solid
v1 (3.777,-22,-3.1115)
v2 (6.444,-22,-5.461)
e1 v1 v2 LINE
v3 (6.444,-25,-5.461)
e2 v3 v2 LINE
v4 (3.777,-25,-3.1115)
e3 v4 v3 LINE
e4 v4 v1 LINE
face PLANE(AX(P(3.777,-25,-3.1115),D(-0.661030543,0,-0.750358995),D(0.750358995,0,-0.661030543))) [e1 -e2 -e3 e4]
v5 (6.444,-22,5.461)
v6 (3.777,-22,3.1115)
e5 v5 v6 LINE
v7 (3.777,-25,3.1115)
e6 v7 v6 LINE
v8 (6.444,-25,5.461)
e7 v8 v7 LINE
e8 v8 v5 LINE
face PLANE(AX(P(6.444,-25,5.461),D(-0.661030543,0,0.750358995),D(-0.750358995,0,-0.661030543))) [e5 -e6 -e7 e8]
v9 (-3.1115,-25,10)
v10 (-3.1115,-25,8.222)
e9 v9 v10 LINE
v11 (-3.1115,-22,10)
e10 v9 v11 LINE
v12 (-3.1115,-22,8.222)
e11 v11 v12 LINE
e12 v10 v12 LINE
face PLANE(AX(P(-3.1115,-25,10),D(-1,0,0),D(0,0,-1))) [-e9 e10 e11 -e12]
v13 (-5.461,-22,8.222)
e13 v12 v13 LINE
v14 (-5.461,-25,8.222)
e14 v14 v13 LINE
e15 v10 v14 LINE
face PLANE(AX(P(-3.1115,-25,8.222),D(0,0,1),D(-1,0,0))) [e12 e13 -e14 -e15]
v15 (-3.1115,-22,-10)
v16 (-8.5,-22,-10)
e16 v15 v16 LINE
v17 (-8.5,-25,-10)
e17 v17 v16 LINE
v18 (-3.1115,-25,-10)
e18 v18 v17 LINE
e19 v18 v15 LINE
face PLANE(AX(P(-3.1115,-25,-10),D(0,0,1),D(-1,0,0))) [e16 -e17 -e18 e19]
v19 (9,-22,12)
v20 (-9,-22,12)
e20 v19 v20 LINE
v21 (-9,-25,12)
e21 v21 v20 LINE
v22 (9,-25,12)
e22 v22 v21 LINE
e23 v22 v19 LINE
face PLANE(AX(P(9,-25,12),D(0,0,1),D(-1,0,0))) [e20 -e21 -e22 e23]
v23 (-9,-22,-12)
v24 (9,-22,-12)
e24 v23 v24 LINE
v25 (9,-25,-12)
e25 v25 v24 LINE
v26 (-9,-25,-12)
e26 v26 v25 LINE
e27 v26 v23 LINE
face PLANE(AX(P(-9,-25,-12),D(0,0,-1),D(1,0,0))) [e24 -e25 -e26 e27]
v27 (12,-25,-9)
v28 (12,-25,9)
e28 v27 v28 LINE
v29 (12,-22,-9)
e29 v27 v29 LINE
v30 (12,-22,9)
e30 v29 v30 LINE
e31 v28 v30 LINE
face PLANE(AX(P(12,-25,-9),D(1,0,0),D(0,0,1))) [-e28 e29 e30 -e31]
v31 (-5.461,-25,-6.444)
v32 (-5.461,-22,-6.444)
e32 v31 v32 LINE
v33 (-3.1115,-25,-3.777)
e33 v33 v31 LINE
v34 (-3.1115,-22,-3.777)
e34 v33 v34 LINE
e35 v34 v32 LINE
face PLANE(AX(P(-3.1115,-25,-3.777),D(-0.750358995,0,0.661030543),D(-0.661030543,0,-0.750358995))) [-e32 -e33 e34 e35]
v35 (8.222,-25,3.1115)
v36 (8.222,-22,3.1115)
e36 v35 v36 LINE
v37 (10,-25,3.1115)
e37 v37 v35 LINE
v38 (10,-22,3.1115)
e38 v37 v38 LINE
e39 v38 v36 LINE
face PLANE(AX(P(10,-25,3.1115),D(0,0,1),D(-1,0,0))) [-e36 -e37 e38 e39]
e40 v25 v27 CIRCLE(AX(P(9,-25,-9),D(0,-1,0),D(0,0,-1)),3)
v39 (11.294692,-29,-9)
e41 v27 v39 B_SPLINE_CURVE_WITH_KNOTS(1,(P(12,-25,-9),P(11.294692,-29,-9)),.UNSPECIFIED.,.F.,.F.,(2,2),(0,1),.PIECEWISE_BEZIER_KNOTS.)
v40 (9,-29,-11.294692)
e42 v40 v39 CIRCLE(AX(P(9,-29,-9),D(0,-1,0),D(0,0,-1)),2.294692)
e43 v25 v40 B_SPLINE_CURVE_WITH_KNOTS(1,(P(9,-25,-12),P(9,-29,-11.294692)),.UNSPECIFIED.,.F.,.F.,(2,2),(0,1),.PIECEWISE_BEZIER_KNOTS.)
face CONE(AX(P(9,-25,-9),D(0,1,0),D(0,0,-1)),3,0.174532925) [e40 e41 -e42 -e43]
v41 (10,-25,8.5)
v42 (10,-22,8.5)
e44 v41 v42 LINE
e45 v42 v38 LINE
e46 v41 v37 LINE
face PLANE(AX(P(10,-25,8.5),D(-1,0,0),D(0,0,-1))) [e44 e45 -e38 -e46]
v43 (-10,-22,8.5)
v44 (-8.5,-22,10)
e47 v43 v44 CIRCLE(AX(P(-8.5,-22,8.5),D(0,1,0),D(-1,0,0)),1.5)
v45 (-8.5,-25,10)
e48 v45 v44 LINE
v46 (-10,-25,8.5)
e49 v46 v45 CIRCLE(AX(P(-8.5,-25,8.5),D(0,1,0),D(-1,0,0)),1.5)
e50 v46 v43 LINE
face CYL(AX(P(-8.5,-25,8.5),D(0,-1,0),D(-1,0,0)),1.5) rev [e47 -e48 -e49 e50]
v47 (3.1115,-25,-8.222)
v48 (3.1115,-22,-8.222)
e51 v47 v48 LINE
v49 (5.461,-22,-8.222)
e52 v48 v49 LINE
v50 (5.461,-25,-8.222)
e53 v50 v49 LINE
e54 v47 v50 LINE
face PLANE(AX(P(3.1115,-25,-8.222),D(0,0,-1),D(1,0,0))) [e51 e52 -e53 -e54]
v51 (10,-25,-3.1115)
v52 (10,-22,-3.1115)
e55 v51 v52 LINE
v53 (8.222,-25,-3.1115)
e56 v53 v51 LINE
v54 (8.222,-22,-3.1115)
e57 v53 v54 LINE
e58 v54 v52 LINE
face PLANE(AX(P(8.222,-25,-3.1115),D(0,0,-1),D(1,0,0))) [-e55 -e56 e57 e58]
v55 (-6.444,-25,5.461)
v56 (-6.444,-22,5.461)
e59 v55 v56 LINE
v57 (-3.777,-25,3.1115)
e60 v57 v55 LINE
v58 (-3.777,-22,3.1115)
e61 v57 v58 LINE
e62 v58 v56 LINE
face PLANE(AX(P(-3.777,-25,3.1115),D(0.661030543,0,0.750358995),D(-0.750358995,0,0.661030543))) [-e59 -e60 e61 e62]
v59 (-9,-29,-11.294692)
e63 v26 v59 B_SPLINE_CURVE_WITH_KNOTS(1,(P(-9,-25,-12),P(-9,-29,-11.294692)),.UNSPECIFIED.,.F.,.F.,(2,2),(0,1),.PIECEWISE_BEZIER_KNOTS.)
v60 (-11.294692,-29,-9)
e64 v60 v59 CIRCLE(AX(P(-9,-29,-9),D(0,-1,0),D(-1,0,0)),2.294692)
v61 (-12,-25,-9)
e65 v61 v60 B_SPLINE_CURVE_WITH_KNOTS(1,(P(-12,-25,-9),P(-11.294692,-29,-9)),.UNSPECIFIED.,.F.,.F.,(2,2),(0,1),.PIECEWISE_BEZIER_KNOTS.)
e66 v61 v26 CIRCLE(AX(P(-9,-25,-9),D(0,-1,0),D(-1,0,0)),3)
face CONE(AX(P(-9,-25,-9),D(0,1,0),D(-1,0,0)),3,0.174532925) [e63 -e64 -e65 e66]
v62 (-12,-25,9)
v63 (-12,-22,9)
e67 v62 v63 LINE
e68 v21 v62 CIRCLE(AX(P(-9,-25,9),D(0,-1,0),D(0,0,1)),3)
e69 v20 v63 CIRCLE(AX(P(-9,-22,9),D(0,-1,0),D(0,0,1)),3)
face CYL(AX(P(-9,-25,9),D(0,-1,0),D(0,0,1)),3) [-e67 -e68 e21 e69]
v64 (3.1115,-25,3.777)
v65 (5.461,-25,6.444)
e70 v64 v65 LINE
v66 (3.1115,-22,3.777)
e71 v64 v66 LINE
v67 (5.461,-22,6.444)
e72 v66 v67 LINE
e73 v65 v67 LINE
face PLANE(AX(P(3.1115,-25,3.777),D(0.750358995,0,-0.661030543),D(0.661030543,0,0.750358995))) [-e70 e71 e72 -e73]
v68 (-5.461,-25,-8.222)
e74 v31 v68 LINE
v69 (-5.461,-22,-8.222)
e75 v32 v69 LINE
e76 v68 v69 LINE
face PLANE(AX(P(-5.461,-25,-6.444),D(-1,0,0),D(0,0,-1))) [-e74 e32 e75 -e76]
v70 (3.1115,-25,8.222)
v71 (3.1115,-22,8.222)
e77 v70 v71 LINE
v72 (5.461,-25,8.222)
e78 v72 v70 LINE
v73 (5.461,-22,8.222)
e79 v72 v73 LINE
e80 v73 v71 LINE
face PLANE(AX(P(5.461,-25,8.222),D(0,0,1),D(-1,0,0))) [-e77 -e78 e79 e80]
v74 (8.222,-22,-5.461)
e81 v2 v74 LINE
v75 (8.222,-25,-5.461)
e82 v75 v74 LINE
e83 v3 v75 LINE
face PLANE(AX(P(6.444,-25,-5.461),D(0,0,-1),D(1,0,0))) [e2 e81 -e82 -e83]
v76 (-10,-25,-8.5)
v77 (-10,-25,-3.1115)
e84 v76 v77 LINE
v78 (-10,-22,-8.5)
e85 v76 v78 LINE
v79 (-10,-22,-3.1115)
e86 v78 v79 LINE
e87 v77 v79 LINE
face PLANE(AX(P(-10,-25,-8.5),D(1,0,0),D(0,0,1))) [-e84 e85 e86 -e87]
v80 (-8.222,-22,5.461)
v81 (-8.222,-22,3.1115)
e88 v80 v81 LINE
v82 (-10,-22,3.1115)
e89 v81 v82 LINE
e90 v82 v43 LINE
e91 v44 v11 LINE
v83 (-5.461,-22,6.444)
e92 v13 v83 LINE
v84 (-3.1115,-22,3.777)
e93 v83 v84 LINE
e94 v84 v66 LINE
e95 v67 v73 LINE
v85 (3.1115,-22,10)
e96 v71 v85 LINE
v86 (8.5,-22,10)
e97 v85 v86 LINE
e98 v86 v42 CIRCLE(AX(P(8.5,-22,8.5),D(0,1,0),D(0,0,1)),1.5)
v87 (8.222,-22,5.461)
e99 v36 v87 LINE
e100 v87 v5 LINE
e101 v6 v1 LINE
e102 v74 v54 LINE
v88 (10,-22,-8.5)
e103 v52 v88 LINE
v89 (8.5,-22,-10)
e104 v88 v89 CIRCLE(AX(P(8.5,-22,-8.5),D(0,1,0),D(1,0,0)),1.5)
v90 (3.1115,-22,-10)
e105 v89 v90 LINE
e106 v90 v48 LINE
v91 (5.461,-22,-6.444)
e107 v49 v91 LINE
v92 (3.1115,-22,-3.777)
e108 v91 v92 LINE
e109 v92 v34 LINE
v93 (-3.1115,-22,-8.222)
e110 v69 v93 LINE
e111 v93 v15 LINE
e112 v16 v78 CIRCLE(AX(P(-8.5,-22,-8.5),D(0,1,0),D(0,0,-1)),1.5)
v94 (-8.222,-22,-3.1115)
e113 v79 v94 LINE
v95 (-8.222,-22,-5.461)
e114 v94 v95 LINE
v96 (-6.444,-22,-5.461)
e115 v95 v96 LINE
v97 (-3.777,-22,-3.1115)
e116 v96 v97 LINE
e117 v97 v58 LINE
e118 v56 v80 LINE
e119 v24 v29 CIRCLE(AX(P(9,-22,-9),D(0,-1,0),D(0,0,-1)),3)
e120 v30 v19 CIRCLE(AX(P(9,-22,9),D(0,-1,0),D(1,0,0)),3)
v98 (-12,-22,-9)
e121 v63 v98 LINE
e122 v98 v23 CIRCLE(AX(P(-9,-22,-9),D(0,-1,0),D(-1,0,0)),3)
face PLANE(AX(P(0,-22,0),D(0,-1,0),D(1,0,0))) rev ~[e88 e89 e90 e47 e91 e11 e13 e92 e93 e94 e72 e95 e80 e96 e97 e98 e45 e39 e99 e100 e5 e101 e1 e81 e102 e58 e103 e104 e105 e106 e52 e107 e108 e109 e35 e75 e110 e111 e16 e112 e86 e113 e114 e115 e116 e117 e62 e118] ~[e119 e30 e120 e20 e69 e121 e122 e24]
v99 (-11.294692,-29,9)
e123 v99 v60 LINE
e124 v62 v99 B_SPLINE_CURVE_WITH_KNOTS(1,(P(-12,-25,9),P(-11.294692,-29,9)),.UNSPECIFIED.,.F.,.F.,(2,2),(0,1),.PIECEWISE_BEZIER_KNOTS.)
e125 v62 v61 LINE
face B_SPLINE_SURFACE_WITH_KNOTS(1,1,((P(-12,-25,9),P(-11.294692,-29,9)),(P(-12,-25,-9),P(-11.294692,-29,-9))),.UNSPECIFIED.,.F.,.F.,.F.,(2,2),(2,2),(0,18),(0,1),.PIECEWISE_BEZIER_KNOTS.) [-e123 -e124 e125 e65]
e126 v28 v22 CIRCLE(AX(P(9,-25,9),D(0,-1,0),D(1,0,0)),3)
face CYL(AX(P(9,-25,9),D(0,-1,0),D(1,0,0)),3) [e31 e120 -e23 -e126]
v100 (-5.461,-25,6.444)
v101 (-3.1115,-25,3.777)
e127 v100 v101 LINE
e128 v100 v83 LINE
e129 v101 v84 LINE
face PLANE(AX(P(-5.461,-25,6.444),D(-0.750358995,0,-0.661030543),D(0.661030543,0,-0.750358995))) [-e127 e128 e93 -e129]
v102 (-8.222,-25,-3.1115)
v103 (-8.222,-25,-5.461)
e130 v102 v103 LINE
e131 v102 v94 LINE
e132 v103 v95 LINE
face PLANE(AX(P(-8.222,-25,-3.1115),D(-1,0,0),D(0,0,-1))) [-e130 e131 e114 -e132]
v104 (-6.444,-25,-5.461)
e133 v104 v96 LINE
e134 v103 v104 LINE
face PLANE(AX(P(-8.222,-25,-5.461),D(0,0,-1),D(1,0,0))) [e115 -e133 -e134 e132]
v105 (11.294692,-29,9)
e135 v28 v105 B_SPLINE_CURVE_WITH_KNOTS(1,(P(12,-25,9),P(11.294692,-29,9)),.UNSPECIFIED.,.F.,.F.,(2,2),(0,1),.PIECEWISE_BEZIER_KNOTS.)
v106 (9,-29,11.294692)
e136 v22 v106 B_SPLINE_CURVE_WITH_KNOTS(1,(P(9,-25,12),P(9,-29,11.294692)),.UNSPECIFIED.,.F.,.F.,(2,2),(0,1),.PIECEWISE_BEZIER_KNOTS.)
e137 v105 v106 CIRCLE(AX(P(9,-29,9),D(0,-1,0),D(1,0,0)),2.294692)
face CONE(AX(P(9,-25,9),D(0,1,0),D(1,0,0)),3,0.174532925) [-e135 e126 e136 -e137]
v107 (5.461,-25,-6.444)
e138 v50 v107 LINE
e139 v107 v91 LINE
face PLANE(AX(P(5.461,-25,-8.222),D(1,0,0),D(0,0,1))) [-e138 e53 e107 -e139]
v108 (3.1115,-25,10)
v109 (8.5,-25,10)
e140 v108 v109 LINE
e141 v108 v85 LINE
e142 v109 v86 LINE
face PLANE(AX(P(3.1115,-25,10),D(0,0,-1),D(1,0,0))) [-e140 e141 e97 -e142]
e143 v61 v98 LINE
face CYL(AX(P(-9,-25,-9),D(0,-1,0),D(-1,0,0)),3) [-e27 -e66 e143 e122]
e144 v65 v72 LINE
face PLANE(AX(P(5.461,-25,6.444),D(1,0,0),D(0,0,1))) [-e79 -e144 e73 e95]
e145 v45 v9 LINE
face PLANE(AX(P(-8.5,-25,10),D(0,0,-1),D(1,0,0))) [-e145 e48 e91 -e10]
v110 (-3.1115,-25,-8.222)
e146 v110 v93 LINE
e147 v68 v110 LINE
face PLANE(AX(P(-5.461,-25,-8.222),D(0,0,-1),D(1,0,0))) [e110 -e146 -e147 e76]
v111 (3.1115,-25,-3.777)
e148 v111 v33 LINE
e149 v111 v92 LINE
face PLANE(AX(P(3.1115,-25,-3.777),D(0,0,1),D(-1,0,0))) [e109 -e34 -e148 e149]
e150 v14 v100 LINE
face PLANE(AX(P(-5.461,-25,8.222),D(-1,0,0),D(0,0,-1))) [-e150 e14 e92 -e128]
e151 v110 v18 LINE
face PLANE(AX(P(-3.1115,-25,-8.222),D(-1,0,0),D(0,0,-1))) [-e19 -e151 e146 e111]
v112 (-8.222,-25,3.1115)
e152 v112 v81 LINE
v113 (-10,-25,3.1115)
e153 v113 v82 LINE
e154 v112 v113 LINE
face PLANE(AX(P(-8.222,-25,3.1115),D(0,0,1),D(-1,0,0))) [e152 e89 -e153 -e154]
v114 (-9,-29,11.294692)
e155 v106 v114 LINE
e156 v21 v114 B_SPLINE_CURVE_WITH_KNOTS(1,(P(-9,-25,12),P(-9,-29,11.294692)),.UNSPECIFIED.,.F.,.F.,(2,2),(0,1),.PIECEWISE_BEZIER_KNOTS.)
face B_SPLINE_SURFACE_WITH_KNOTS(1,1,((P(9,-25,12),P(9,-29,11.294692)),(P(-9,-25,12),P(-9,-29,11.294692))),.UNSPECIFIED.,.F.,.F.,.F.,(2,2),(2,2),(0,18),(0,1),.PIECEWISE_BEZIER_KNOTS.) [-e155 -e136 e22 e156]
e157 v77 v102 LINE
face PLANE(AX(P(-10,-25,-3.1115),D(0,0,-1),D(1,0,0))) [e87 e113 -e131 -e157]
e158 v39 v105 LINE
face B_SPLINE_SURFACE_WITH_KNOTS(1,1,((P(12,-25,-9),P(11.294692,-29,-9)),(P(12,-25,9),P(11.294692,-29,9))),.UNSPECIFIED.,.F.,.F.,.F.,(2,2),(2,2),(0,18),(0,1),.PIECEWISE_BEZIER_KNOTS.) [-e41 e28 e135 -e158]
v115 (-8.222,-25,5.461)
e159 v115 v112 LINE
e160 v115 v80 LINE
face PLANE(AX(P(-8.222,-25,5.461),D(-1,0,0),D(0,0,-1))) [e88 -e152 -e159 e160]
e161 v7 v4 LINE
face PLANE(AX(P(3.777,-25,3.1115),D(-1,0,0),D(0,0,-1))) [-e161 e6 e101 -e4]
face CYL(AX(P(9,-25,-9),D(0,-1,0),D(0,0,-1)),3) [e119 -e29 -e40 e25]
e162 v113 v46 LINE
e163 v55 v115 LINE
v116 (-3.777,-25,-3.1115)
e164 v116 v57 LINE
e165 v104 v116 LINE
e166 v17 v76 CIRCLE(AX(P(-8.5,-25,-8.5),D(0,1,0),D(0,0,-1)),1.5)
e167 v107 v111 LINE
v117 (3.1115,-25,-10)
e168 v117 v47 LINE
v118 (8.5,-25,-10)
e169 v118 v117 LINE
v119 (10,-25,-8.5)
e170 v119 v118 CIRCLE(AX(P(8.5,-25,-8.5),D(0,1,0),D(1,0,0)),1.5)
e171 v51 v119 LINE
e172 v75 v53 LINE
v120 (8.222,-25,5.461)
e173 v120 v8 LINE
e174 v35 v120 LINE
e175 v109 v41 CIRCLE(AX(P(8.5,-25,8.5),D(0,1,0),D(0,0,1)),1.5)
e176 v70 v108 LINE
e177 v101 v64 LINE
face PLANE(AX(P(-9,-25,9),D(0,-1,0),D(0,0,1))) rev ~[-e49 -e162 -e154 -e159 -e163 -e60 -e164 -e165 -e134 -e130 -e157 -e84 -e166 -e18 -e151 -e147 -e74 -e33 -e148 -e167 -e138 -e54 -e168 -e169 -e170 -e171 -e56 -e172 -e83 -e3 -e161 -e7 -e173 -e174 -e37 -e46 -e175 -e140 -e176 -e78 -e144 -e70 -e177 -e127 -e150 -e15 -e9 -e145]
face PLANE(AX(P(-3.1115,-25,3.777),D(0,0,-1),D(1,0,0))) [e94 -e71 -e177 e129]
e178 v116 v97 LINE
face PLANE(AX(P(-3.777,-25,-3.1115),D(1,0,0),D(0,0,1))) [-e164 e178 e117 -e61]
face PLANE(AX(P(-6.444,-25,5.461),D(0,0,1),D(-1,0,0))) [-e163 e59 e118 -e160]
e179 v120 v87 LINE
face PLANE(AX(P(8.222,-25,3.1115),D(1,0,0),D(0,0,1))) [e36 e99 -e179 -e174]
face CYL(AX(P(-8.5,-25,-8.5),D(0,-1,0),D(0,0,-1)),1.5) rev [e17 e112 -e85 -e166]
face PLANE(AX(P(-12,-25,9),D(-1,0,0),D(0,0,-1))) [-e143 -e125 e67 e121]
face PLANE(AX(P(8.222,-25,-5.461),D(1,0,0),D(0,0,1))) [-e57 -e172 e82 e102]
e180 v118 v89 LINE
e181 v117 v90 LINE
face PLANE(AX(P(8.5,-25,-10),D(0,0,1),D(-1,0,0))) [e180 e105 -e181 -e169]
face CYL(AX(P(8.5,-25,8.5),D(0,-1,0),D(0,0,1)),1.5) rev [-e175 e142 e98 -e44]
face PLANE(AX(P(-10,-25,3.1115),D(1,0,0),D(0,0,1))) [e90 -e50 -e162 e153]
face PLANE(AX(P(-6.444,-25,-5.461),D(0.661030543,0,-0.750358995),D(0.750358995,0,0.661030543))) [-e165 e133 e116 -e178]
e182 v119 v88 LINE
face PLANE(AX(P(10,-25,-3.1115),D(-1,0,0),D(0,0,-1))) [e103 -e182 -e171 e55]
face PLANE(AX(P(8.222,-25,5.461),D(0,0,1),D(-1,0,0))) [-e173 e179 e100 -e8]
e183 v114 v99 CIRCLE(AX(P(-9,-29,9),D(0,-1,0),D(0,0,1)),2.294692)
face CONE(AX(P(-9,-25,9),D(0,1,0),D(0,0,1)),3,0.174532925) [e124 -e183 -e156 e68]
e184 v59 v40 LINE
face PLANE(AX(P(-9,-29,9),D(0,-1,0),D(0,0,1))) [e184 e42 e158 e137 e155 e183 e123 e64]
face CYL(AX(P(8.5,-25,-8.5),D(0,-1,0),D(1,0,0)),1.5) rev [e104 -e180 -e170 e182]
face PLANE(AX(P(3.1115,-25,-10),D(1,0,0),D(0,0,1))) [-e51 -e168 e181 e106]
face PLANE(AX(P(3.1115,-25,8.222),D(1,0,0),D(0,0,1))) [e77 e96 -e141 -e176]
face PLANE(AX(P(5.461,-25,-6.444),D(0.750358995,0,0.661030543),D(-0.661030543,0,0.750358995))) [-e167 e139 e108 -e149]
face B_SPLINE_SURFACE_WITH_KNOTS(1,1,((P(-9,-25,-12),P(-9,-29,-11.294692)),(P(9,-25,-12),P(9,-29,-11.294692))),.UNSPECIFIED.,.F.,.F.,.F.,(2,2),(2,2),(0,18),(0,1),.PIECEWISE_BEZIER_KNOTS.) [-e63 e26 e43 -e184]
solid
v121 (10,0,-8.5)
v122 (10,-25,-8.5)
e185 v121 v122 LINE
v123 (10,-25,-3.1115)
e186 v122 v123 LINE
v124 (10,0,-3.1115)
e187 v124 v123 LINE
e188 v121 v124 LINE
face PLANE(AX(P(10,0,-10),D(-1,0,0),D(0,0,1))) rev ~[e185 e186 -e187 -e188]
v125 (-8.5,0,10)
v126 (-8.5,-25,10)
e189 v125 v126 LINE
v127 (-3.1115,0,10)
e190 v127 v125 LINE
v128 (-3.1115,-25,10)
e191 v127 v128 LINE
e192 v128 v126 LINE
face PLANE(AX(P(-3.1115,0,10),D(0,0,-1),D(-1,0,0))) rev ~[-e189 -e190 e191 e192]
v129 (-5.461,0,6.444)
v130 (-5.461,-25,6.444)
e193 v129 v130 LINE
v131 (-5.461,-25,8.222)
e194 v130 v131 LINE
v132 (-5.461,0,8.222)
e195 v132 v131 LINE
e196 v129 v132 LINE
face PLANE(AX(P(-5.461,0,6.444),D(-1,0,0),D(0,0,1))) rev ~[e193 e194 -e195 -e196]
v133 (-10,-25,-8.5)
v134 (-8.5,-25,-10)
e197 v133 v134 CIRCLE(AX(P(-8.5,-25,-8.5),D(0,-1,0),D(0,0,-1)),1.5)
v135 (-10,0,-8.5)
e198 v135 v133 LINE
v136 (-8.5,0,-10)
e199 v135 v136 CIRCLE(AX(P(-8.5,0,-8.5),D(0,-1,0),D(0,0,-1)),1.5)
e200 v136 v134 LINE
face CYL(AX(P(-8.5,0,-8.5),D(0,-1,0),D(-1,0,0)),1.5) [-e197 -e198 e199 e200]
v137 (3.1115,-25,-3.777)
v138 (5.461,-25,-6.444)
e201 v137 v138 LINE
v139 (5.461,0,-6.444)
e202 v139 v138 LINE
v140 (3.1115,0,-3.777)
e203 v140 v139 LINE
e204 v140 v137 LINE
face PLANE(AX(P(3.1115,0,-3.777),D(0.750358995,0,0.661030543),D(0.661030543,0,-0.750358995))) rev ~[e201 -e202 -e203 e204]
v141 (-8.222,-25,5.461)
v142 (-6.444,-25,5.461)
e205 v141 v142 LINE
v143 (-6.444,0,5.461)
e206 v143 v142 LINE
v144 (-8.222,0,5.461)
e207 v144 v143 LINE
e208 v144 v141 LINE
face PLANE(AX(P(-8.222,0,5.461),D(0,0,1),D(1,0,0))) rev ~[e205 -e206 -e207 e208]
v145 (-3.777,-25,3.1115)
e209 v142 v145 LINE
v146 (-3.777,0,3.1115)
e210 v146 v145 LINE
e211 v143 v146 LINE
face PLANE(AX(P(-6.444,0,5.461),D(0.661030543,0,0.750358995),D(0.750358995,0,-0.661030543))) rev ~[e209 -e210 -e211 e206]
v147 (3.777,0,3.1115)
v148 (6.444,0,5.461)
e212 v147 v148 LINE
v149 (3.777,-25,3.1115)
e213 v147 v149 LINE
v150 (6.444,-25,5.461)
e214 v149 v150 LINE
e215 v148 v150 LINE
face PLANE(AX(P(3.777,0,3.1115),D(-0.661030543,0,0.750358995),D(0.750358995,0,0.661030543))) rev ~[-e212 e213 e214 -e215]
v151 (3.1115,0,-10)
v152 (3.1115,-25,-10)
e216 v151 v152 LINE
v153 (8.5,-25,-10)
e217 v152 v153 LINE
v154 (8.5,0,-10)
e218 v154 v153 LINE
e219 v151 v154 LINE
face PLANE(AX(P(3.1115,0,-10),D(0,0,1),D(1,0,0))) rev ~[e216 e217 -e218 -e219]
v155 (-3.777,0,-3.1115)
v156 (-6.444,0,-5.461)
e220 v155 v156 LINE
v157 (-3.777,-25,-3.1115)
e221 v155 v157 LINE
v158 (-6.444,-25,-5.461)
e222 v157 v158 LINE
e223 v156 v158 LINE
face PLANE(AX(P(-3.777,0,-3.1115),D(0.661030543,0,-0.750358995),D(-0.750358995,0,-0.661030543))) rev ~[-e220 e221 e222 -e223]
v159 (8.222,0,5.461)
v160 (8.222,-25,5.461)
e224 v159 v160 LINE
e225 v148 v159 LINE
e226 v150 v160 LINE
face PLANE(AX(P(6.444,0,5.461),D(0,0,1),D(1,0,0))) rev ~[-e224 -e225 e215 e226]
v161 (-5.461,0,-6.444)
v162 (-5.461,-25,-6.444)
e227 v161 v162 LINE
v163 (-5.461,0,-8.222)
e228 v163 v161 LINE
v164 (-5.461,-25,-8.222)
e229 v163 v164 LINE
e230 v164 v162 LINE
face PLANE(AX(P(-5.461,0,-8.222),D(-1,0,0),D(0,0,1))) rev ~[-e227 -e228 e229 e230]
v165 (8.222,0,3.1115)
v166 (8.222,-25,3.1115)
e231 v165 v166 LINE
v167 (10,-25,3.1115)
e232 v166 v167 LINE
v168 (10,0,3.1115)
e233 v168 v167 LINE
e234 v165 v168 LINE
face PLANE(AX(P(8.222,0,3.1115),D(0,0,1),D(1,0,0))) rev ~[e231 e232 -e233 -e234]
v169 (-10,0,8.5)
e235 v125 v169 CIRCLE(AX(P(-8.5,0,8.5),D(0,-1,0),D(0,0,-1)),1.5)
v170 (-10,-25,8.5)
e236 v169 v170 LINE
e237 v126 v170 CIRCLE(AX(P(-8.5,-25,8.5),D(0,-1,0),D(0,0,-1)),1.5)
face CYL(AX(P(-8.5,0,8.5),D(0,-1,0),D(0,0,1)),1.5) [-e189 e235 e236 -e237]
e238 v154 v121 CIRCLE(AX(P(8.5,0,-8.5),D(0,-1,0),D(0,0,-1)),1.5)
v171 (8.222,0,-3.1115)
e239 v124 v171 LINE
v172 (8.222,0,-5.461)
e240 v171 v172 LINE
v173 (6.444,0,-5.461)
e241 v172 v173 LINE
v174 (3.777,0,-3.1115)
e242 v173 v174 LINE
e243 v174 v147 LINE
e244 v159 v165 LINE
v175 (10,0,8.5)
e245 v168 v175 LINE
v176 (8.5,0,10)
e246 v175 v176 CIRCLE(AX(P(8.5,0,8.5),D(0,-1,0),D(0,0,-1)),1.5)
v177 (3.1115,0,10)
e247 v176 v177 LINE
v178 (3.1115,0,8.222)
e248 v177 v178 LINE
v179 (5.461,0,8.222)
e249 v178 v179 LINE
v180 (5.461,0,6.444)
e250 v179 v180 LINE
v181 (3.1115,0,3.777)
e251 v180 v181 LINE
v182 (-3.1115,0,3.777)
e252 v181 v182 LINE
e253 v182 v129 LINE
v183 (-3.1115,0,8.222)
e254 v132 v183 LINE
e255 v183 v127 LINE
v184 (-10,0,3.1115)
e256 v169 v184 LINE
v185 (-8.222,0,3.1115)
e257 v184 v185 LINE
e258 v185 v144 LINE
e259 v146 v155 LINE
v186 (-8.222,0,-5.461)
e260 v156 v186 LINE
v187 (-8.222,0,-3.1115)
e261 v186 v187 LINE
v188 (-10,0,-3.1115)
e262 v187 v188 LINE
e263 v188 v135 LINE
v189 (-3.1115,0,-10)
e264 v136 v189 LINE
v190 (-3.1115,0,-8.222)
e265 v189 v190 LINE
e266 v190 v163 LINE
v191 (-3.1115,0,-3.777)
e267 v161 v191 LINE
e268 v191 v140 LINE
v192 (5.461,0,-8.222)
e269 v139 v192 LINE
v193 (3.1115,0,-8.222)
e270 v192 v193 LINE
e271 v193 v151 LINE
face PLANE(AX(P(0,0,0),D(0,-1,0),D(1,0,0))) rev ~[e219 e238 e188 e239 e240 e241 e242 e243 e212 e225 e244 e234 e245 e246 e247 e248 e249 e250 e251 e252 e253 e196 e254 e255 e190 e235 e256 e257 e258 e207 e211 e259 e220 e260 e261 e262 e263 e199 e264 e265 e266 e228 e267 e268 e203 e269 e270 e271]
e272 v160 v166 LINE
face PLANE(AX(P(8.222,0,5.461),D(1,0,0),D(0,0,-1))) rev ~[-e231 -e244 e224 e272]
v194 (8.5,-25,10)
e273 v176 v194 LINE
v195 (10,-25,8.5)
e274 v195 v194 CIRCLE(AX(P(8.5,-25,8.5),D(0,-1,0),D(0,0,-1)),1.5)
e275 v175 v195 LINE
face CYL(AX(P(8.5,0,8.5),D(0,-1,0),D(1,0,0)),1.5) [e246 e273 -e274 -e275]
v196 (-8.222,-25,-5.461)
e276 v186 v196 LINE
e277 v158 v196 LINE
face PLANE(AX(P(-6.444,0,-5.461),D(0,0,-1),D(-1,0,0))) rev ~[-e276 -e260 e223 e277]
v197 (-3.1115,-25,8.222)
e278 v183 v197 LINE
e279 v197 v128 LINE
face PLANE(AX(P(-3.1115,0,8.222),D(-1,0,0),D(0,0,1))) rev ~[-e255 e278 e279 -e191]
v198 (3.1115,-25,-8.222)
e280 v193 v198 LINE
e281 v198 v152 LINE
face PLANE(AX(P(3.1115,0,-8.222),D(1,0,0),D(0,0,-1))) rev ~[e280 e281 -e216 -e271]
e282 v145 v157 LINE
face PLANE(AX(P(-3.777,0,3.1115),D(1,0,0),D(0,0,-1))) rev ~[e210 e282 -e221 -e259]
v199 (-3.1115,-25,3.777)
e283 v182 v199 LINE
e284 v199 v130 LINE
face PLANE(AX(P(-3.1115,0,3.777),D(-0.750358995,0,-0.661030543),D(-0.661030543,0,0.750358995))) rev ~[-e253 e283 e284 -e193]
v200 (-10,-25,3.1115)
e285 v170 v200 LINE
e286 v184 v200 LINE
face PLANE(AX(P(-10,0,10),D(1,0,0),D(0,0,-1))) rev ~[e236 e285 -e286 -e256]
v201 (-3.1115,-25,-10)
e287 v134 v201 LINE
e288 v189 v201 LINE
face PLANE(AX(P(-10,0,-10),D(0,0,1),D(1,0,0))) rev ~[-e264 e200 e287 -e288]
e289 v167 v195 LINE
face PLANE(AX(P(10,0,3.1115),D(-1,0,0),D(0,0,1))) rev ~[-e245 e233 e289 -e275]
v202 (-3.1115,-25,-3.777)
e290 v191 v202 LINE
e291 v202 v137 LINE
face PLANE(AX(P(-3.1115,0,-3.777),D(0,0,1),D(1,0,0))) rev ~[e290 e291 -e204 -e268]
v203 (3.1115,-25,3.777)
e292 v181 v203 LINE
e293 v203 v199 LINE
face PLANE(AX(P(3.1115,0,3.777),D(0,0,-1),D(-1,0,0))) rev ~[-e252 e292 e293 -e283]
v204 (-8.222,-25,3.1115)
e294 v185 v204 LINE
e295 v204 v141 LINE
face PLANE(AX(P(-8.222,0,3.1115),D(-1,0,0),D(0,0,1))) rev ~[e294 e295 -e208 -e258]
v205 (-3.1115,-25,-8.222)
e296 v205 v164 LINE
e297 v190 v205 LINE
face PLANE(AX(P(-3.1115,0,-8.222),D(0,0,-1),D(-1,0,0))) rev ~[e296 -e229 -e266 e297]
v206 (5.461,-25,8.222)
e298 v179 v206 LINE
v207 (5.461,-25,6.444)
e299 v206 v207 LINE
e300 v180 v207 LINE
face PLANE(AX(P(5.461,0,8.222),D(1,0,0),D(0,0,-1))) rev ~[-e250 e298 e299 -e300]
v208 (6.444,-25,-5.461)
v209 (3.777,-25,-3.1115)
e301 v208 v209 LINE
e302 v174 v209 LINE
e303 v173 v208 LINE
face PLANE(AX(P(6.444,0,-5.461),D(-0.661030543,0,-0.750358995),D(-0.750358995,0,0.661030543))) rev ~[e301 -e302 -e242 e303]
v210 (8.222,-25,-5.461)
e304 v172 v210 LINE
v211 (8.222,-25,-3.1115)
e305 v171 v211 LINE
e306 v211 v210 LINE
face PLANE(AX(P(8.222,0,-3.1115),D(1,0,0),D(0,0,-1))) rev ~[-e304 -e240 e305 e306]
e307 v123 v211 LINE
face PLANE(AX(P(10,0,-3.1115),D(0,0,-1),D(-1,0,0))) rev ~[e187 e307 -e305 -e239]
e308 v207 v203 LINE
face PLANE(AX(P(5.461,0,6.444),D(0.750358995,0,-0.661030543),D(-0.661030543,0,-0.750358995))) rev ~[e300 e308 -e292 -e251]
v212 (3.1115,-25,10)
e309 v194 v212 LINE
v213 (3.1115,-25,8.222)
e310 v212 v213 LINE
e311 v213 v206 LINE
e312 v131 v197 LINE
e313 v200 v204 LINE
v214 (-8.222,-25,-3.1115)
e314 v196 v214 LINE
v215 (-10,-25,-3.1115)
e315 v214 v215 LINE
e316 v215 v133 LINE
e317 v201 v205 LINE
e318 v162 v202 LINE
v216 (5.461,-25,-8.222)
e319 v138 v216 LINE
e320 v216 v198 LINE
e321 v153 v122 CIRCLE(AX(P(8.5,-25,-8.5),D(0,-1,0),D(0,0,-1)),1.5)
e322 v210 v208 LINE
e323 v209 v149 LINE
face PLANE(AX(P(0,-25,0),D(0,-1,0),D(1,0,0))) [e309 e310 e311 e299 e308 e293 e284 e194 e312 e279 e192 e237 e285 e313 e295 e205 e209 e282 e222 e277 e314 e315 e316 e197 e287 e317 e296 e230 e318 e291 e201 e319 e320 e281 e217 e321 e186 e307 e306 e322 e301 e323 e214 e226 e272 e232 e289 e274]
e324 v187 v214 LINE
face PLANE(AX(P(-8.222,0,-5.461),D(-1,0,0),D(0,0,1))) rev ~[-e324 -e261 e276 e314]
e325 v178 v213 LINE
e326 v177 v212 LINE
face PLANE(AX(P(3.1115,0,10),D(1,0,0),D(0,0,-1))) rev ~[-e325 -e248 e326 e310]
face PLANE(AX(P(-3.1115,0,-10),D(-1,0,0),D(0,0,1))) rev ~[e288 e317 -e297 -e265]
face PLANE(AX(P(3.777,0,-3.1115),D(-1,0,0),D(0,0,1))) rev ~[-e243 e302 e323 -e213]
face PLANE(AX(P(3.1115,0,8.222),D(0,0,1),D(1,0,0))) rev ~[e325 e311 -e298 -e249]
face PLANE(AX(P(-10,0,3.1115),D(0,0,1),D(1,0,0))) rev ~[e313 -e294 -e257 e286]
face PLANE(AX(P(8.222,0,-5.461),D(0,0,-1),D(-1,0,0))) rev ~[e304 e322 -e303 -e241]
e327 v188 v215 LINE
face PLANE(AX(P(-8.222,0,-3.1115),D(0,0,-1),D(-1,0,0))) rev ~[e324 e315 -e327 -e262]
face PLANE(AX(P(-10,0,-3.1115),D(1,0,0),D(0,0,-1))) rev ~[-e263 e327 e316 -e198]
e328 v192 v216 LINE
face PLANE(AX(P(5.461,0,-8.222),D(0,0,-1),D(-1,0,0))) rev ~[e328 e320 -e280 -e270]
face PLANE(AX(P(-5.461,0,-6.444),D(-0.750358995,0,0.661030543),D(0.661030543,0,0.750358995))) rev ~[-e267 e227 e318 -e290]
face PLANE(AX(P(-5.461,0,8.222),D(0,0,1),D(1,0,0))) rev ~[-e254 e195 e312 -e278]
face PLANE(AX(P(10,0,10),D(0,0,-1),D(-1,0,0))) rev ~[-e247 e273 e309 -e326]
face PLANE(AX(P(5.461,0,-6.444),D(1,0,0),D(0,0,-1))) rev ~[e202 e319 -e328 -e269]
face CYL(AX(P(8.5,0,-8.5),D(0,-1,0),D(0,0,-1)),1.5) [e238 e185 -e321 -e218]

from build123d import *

# Parameters (mm, degrees)
F1_DEPTH = 25
F2_R     = 1.5
F4_DEPTH = 4
F4_TAPER = 10
F5_DEPTH = 3


with BuildPart() as f1:
    # F0 (on Front) → F1 (new body)
    with BuildSketch(Plane.XZ):
        Polygon((10, 3.1115), (10, 10), (3.1115, 10), (3.1115, 8.222), (5.461, 8.222), (5.461, 6.444), (3.1115, 3.777), (0, 3.777), (-3.1115, 3.777), (-5.461, 6.444), (-5.461, 8.222), (-3.1115, 8.222), (-3.1115, 10), (-10, 10), (-10, 3.1115), (-8.222, 3.1115), (-8.222, 5.461), (-6.444, 5.461), (-3.777, 3.1115), (-3.777, 0), (-3.777, -3.1115), (-6.444, -5.461), (-8.222, -5.461), (-8.222, -3.1115), (-10, -3.1115), (-10, -10), (-3.1115, -10), (-3.1115, -8.222), (-5.461, -8.222), (-5.461, -6.444), (-3.1115, -3.777), (0, -3.777), (3.1115, -3.777), (5.461, -6.444), (5.461, -8.222), (3.1115, -8.222), (3.1115, -10), (10, -10), (10, -3.1115), (8.222, -3.1115), (8.222, -5.461), (6.444, -5.461), (3.777, -3.1115), (3.777, 0), (3.777, 3.1115), (6.444, 5.461), (8.222, 5.461), (8.222, 3.1115), align=None)
    extrude(amount=F1_DEPTH)

    # F2
    f2_edges = [f1.edges().sort_by_distance(p)[0] for p in [
        (-10, -12.5, 10),
        (10, -12.5, 10),
        (10, -12.5, -10),
        (-10, -12.5, -10),
    ]]
    fillet(f2_edges, radius=F2_R)


with BuildPart() as f4:
    # F3 (on face) → F4 (new body)
    with BuildSketch(Plane.XZ.offset(25)):
        with BuildLine():
            Line((9, 12), (-9, 12))
            ThreePointArc((-9, 12), (-11.1213203436, 11.1213203436), (-12, 9))
            Line((-12, 9), (-12, -9))
            ThreePointArc((-12, -9), (-11.1213203436, -11.1213203436), (-9, -12))
            Line((-9, -12), (9, -12))
            ThreePointArc((9, -12), (11.1213203436, -11.1213203436), (12, -9))
            Line((12, -9), (12, 9))
            ThreePointArc((12, 9), (11.1213203436, 11.1213203436), (9, 12))
        make_face()
        with BuildLine():
            Line((10, 8.5), (10, 3.1115))
            Line((10, 3.1115), (8.222, 3.1115))
            Line((8.222, 3.1115), (8.222, 5.461))
            Line((8.222, 5.461), (6.444, 5.461))
            Line((6.444, 5.461), (3.777, 3.1115))
            Line((3.777, 3.1115), (3.777, -3.1115))
            Line((3.777, -3.1115), (6.444, -5.461))
            Line((6.444, -5.461), (8.222, -5.461))
            Line((8.222, -5.461), (8.222, -3.1115))
            Line((8.222, -3.1115), (10, -3.1115))
            Line((10, -3.1115), (10, -8.5))
            ThreePointArc((10, -8.5), (9.5606601718, -9.5606601718), (8.5, -10))
            Line((8.5, -10), (3.1115, -10))
            Line((3.1115, -10), (3.1115, -8.222))
            Line((3.1115, -8.222), (5.461, -8.222))
            Line((5.461, -8.222), (5.461, -6.444))
            Line((5.461, -6.444), (3.1115, -3.777))
            Line((3.1115, -3.777), (-3.1115, -3.777))
            Line((-3.1115, -3.777), (-5.461, -6.444))
            Line((-5.461, -6.444), (-5.461, -8.222))
            Line((-5.461, -8.222), (-3.1115, -8.222))
            Line((-3.1115, -8.222), (-3.1115, -10))
            Line((-3.1115, -10), (-8.5, -10))
            ThreePointArc((-8.5, -10), (-9.5606601718, -9.5606601718), (-10, -8.5))
            Line((-10, -8.5), (-10, -3.1115))
            Line((-10, -3.1115), (-8.222, -3.1115))
            Line((-8.222, -3.1115), (-8.222, -5.461))
            Line((-8.222, -5.461), (-6.444, -5.461))
            Line((-6.444, -5.461), (-3.777, -3.1115))
            Line((-3.777, -3.1115), (-3.777, 3.1115))
            Line((-3.777, 3.1115), (-6.444, 5.461))
            Line((-6.444, 5.461), (-8.222, 5.461))
            Line((-8.222, 5.461), (-8.222, 3.1115))
            Line((-8.222, 3.1115), (-10, 3.1115))
            Line((-10, 3.1115), (-10, 8.5))
            ThreePointArc((-10, 8.5), (-9.5606601718, 9.5606601718), (-8.5, 10))
            Line((-8.5, 10), (-3.1115, 10))
            Line((-3.1115, 10), (-3.1115, 8.222))
            Line((-3.1115, 8.222), (-5.461, 8.222))
            Line((-5.461, 8.222), (-5.461, 6.444))
            Line((-5.461, 6.444), (-3.1115, 3.777))
            Line((-3.1115, 3.777), (3.1115, 3.777))
            Line((3.1115, 3.777), (5.461, 6.444))
            Line((5.461, 6.444), (5.461, 8.222))
            Line((5.461, 8.222), (3.1115, 8.222))
            Line((3.1115, 8.222), (3.1115, 10))
            Line((3.1115, 10), (8.5, 10))
            ThreePointArc((8.5, 10), (9.5606601718, 9.5606601718), (10, 8.5))
        make_face(mode=Mode.SUBTRACT)
        with BuildLine():
            Line((8.222, 3.1115), (10, 3.1115))
            Line((10, 3.1115), (10, 8.5))
            ThreePointArc((10, 8.5), (9.5606601718, 9.5606601718), (8.5, 10))
            Line((8.5, 10), (3.1115, 10))
            Line((3.1115, 10), (3.1115, 8.222))
            Line((3.1115, 8.222), (5.461, 8.222))
            Line((5.461, 8.222), (5.461, 6.444))
            Line((5.461, 6.444), (3.1115, 3.777))
            Line((3.1115, 3.777), (-3.1115, 3.777))
            Line((-3.1115, 3.777), (-5.461, 6.444))
            Line((-5.461, 6.444), (-5.461, 8.222))
            Line((-5.461, 8.222), (-3.1115, 8.222))
            Line((-3.1115, 8.222), (-3.1115, 10))
            Line((-3.1115, 10), (-8.5, 10))
            ThreePointArc((-8.5, 10), (-9.5606601718, 9.5606601718), (-10, 8.5))
            Line((-10, 8.5), (-10, 3.1115))
            Line((-10, 3.1115), (-8.222, 3.1115))
            Line((-8.222, 3.1115), (-8.222, 5.461))
            Line((-8.222, 5.461), (-6.444, 5.461))
            Line((-6.444, 5.461), (-3.777, 3.1115))
            Line((-3.777, 3.1115), (-3.777, -3.1115))
            Line((-3.777, -3.1115), (-6.444, -5.461))
            Line((-6.444, -5.461), (-8.222, -5.461))
            Line((-8.222, -5.461), (-8.222, -3.1115))
            Line((-8.222, -3.1115), (-10, -3.1115))
            Line((-10, -3.1115), (-10, -8.5))
            ThreePointArc((-10, -8.5), (-9.5606601718, -9.5606601718), (-8.5, -10))
            Line((-8.5, -10), (-3.1115, -10))
            Line((-3.1115, -10), (-3.1115, -8.222))
            Line((-3.1115, -8.222), (-5.461, -8.222))
            Line((-5.461, -8.222), (-5.461, -6.444))
            Line((-5.461, -6.444), (-3.1115, -3.777))
            Line((-3.1115, -3.777), (3.1115, -3.777))
            Line((3.1115, -3.777), (5.461, -6.444))
            Line((5.461, -6.444), (5.461, -8.222))
            Line((5.461, -8.222), (3.1115, -8.222))
            Line((3.1115, -8.222), (3.1115, -10))
            Line((3.1115, -10), (8.5, -10))
            ThreePointArc((8.5, -10), (9.5606601718, -9.5606601718), (10, -8.5))
            Line((10, -8.5), (10, -3.1115))
            Line((10, -3.1115), (8.222, -3.1115))
            Line((8.222, -3.1115), (8.222, -5.461))
            Line((8.222, -5.461), (6.444, -5.461))
            Line((6.444, -5.461), (3.777, -3.1115))
            Line((3.777, -3.1115), (3.777, 3.1115))
            Line((3.777, 3.1115), (6.444, 5.461))
            Line((6.444, 5.461), (8.222, 5.461))
            Line((8.222, 5.461), (8.222, 3.1115))
        make_face()
    extrude(amount=F4_DEPTH, taper=F4_TAPER)

    # F3 (on face) → F5 (join)
    with BuildSketch(Plane.XZ.offset(25)):
        with BuildLine():
            Line((9, 12), (-9, 12))
            ThreePointArc((-9, 12), (-11.1213203436, 11.1213203436), (-12, 9))
            Line((-12, 9), (-12, -9))
            ThreePointArc((-12, -9), (-11.1213203436, -11.1213203436), (-9, -12))
            Line((-9, -12), (9, -12))
            ThreePointArc((9, -12), (11.1213203436, -11.1213203436), (12, -9))
            Line((12, -9), (12, 9))
            ThreePointArc((12, 9), (11.1213203436, 11.1213203436), (9, 12))
        make_face()
        with BuildLine():
            Line((10, 8.5), (10, 3.1115))
            Line((10, 3.1115), (8.222, 3.1115))
            Line((8.222, 3.1115), (8.222, 5.461))
            Line((8.222, 5.461), (6.444, 5.461))
            Line((6.444, 5.461), (3.777, 3.1115))
            Line((3.777, 3.1115), (3.777, -3.1115))
            Line((3.777, -3.1115), (6.444, -5.461))
            Line((6.444, -5.461), (8.222, -5.461))
            Line((8.222, -5.461), (8.222, -3.1115))
            Line((8.222, -3.1115), (10, -3.1115))
            Line((10, -3.1115), (10, -8.5))
            ThreePointArc((10, -8.5), (9.5606601718, -9.5606601718), (8.5, -10))
            Line((8.5, -10), (3.1115, -10))
            Line((3.1115, -10), (3.1115, -8.222))
            Line((3.1115, -8.222), (5.461, -8.222))
            Line((5.461, -8.222), (5.461, -6.444))
            Line((5.461, -6.444), (3.1115, -3.777))
            Line((3.1115, -3.777), (-3.1115, -3.777))
            Line((-3.1115, -3.777), (-5.461, -6.444))
            Line((-5.461, -6.444), (-5.461, -8.222))
            Line((-5.461, -8.222), (-3.1115, -8.222))
            Line((-3.1115, -8.222), (-3.1115, -10))
            Line((-3.1115, -10), (-8.5, -10))
            ThreePointArc((-8.5, -10), (-9.5606601718, -9.5606601718), (-10, -8.5))
            Line((-10, -8.5), (-10, -3.1115))
            Line((-10, -3.1115), (-8.222, -3.1115))
            Line((-8.222, -3.1115), (-8.222, -5.461))
            Line((-8.222, -5.461), (-6.444, -5.461))
            Line((-6.444, -5.461), (-3.777, -3.1115))
            Line((-3.777, -3.1115), (-3.777, 3.1115))
            Line((-3.777, 3.1115), (-6.444, 5.461))
            Line((-6.444, 5.461), (-8.222, 5.461))
            Line((-8.222, 5.461), (-8.222, 3.1115))
            Line((-8.222, 3.1115), (-10, 3.1115))
            Line((-10, 3.1115), (-10, 8.5))
            ThreePointArc((-10, 8.5), (-9.5606601718, 9.5606601718), (-8.5, 10))
            Line((-8.5, 10), (-3.1115, 10))
            Line((-3.1115, 10), (-3.1115, 8.222))
            Line((-3.1115, 8.222), (-5.461, 8.222))
            Line((-5.461, 8.222), (-5.461, 6.444))
            Line((-5.461, 6.444), (-3.1115, 3.777))
            Line((-3.1115, 3.777), (3.1115, 3.777))
            Line((3.1115, 3.777), (5.461, 6.444))
            Line((5.461, 6.444), (5.461, 8.222))
            Line((5.461, 8.222), (3.1115, 8.222))
            Line((3.1115, 8.222), (3.1115, 10))
            Line((3.1115, 10), (8.5, 10))
            ThreePointArc((8.5, 10), (9.5606601718, 9.5606601718), (10, 8.5))
        make_face(mode=Mode.SUBTRACT)
    extrude(amount=-F5_DEPTH)


solid = Compound([f1.part, f4.part])
